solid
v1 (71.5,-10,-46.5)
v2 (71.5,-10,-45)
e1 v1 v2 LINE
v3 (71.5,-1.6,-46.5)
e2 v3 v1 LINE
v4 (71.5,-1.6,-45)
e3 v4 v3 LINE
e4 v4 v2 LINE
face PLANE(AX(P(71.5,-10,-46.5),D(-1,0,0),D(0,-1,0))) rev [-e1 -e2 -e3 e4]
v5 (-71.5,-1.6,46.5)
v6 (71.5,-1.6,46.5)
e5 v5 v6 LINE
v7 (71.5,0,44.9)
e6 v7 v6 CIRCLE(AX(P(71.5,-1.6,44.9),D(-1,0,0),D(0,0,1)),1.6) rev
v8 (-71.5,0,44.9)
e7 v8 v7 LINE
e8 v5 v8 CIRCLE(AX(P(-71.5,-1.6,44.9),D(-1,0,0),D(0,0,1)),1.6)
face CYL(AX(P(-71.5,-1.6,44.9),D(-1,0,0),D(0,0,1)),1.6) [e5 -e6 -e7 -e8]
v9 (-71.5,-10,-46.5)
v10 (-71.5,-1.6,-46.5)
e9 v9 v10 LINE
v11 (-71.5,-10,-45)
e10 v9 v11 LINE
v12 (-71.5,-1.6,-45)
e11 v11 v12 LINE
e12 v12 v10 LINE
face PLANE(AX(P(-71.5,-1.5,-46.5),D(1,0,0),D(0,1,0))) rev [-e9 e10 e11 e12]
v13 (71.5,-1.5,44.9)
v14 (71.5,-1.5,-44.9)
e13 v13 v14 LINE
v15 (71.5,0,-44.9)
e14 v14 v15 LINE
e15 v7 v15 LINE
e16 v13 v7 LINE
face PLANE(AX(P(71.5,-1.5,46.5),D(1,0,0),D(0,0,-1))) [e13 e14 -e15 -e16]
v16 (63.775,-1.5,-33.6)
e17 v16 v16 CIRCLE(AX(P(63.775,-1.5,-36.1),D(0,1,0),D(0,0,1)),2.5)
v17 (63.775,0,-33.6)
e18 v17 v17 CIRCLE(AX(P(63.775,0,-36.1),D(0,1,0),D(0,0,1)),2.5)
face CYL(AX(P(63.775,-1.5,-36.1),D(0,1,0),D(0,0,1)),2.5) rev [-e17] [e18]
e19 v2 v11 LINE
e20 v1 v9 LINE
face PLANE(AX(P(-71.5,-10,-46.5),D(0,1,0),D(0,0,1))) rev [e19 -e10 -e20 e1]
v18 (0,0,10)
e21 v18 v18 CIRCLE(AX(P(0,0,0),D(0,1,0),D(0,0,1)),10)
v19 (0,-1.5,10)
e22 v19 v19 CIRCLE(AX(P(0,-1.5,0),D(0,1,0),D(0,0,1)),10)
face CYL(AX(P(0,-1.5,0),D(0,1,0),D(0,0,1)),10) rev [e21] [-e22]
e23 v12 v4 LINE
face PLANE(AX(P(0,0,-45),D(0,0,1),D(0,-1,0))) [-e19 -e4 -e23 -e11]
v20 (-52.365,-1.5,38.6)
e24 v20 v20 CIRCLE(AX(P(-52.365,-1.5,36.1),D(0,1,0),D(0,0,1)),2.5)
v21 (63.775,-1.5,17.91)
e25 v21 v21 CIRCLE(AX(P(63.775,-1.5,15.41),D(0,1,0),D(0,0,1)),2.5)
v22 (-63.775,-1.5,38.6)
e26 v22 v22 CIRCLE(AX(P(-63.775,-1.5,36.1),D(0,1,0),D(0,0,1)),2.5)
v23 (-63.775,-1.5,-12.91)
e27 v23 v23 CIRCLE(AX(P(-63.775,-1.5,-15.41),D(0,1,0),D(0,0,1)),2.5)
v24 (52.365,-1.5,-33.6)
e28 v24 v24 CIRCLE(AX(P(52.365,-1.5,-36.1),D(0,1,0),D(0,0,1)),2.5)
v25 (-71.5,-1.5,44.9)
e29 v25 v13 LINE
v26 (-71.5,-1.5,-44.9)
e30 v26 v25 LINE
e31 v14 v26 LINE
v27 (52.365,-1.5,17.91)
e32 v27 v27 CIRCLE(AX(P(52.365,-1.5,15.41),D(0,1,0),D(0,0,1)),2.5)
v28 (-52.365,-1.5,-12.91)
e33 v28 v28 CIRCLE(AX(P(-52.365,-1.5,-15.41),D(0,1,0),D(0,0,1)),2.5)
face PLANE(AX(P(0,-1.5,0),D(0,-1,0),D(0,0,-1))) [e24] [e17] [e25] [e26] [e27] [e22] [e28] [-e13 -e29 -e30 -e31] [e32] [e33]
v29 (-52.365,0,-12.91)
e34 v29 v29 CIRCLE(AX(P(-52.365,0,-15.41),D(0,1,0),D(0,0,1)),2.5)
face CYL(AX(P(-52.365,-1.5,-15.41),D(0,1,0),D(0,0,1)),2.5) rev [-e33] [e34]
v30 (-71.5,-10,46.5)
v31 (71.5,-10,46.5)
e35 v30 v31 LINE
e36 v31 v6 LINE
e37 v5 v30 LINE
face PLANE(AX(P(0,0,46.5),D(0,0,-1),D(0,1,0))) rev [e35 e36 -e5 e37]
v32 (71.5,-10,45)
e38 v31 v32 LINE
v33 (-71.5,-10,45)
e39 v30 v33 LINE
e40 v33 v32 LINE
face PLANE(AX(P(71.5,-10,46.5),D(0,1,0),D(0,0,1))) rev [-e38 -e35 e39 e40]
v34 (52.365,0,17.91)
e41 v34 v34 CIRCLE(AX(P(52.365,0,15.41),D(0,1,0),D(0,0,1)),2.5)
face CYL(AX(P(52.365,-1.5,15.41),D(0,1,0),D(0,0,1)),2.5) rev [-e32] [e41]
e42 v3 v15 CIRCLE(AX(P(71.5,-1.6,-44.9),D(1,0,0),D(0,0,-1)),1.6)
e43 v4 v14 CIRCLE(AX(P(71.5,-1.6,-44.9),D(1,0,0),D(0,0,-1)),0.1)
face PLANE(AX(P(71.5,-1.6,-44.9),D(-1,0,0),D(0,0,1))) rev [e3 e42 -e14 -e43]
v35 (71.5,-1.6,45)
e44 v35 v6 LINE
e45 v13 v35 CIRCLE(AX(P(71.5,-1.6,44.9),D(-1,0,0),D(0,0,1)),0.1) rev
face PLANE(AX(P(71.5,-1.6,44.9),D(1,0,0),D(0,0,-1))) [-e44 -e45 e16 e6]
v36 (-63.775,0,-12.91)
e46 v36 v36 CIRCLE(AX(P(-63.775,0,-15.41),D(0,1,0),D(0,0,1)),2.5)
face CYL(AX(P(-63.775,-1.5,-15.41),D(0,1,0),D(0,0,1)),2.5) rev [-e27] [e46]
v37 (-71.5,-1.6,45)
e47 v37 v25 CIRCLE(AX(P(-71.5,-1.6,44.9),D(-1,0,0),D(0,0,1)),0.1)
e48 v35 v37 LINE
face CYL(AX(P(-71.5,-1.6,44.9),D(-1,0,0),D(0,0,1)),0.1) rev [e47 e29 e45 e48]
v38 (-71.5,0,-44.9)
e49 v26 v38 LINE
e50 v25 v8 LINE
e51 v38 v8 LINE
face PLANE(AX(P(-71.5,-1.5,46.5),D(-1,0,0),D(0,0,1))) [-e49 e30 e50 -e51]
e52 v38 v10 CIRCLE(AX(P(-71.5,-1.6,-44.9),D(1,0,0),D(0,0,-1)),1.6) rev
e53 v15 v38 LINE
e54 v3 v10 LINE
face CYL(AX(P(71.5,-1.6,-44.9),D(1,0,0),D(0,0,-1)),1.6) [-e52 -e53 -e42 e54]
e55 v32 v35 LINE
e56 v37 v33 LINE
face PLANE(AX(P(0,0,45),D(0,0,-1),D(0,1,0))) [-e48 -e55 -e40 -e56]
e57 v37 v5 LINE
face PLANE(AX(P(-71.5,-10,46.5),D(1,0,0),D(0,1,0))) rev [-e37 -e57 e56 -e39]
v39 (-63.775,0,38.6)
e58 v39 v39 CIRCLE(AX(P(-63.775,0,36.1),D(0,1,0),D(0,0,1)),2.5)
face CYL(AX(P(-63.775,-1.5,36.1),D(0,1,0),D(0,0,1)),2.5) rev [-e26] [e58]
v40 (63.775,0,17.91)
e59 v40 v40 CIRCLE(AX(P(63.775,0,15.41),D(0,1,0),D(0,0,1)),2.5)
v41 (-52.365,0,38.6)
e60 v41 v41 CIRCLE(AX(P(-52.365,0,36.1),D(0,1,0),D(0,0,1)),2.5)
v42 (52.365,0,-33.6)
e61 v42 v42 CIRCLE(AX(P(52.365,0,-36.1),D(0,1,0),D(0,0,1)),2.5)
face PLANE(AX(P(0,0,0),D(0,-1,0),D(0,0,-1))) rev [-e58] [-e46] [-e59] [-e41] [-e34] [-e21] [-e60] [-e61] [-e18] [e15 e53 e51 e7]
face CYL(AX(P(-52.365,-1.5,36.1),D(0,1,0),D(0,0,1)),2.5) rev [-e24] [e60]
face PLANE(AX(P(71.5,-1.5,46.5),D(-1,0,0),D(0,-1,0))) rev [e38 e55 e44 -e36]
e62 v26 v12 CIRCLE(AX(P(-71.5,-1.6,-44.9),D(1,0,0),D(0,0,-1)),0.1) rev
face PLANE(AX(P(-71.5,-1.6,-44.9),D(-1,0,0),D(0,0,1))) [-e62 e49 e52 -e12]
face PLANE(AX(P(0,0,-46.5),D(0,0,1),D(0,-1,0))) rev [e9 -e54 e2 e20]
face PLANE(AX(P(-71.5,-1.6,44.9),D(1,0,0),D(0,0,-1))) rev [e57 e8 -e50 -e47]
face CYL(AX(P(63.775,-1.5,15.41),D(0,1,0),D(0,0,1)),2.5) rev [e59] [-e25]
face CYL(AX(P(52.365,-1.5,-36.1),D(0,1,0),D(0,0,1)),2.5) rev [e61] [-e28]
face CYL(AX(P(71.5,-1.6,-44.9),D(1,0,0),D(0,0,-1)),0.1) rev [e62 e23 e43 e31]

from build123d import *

# Parameters (mm, degrees)
SKETCH2_W                      = 143
SKETCH2_H                      = 93
BASE_FLANGE1_DEPTH             = 1.5
EDGE_FLANGE1_STRIP_W           = 6.2
EDGE_FLANGE1_STRIP_H           = 1.5
EDGE_FLANGE1_STRIP_CUT_DEPTH   = 143
EDGE_FLANGE1_STRIP_2_W         = 6.2
EDGE_FLANGE1_STRIP_2_H         = 1.5
EDGE_FLANGE1_STRIP_CUT_2_DEPTH = 143
EDGE_FLANGE1_DEPTH             = 143
EDGE_FLANGE1_BEND_DEPTH        = 143
SKETCH13_R                     = 10
CUT_EXTRUDE1_DEPTH             = 1.5
SKETCH14_R                     = 2.5
CUT_EXTRUDE2_DEPTH             = 1.5


# Sheet-metal steps are written as plain solids
with BuildPart() as part:
    # Sketch2 → Base-Flange1 (new body)
    with BuildSketch(Plane(origin=(0, 0, 0), x_dir=(1, 0, 0), z_dir=(0, 1, 0))):
        Rectangle(SKETCH2_W, SKETCH2_H)
    extrude(amount=-BASE_FLANGE1_DEPTH)

    # Edge-Flange1 strip (across the edge) → Edge-Flange1 strip cut (cut)
    with BuildSketch(Plane(origin=(71.5, -1.5, 46.5), x_dir=(0, 0, -1), z_dir=(-1, 0, 0))):
        with Locations((-1.5, -0.75)):
            Rectangle(EDGE_FLANGE1_STRIP_W, EDGE_FLANGE1_STRIP_H)
    extrude(amount=EDGE_FLANGE1_STRIP_CUT_DEPTH, mode=Mode.SUBTRACT)

    # Edge-Flange1 strip 2 (across the edge) → Edge-Flange1 strip cut 2 (cut)
    with BuildSketch(Plane(origin=(-71.5, -1.5, -46.5), x_dir=(0, 0, 1), z_dir=(1, 0, 0))):
        with Locations((-1.5, -0.75)):
            Rectangle(EDGE_FLANGE1_STRIP_2_W, EDGE_FLANGE1_STRIP_2_H)
    extrude(amount=EDGE_FLANGE1_STRIP_CUT_2_DEPTH, mode=Mode.SUBTRACT)

    # Edge-Flange1 section (across the edge) → Edge-Flange1 (add)
    with BuildSketch(Plane(origin=(71.5, -1.5, 46.5), x_dir=(0, 0, -1), z_dir=(-1, 0, 0))):
        with BuildLine():
            Line((0, 0.1), (0, 8.5))
            Line((0, 8.5), (1.5, 8.5))
            Line((1.5, 8.5), (1.5, 0.1))
            ThreePointArc((1.5, 0.1), (1.529289322, 0.029289322), (1.6, 0))
            Line((1.6, 0), (1.6, -1.5))
            ThreePointArc((1.6, -1.5), (0.46862915, -1.03137085), (0, 0.1))
        make_face()
    extrude(amount=EDGE_FLANGE1_DEPTH)

    # Edge-Flange1 section 2 (across the edge) → Edge-Flange1 bend (add)
    with BuildSketch(Plane(origin=(-71.5, -1.5, -46.5), x_dir=(0, 0, 1), z_dir=(1, 0, 0))):
        with BuildLine():
            Line((0, 0.1), (0, 8.5))
            Line((0, 8.5), (1.5, 8.5))
            Line((1.5, 8.5), (1.5, 0.1))
            ThreePointArc((1.5, 0.1), (1.529289322, 0.029289322), (1.6, 0))
            Line((1.6, 0), (1.6, -1.5))
            ThreePointArc((1.6, -1.5), (0.46862915, -1.03137085), (0, 0.1))
        make_face()
    extrude(amount=EDGE_FLANGE1_BEND_DEPTH)

    # Sketch13 → Cut-Extrude1 (cut)
    with BuildSketch(Plane(origin=(0, 0, 0), x_dir=(1, 0, 0), z_dir=(0, 1, 0))):
        with Locations(Location((0, 0, 0), (0, 0, 270))):
            Circle(SKETCH13_R)
    extrude(amount=-CUT_EXTRUDE1_DEPTH, mode=Mode.SUBTRACT)

    # Sketch14 → Cut-Extrude2 (cut)
    with BuildSketch(Plane(origin=(0, 0, 0), x_dir=(1, 0, 0), z_dir=(0, 1, 0))):
        with Locations(Location((63.775, 36.1, 0), (0, 0, 270))):
            Circle(SKETCH14_R)
        with Locations(Location((52.365, 36.1, 0), (0, 0, 270))):
            Circle(SKETCH14_R)
        with Locations(Location((52.365, -15.41, 0), (0, 0, 270))):
            Circle(SKETCH14_R)
        with Locations(Location((63.775, -15.41, 0), (0, 0, 270))):
            Circle(SKETCH14_R)
        with Locations(Location((-63.775, -36.1, 0), (0, 0, 270))):
            Circle(SKETCH14_R)
        with Locations(Location((-52.365, -36.1, 0), (0, 0, 270))):
            Circle(SKETCH14_R)
        with Locations(Location((-52.365, 15.41, 0), (0, 0, 270))):
            Circle(SKETCH14_R)
        with Locations(Location((-63.775, 15.41, 0), (0, 0, 270))):
            Circle(SKETCH14_R)
    extrude(amount=-CUT_EXTRUDE2_DEPTH, mode=Mode.SUBTRACT)


solid = part.part
